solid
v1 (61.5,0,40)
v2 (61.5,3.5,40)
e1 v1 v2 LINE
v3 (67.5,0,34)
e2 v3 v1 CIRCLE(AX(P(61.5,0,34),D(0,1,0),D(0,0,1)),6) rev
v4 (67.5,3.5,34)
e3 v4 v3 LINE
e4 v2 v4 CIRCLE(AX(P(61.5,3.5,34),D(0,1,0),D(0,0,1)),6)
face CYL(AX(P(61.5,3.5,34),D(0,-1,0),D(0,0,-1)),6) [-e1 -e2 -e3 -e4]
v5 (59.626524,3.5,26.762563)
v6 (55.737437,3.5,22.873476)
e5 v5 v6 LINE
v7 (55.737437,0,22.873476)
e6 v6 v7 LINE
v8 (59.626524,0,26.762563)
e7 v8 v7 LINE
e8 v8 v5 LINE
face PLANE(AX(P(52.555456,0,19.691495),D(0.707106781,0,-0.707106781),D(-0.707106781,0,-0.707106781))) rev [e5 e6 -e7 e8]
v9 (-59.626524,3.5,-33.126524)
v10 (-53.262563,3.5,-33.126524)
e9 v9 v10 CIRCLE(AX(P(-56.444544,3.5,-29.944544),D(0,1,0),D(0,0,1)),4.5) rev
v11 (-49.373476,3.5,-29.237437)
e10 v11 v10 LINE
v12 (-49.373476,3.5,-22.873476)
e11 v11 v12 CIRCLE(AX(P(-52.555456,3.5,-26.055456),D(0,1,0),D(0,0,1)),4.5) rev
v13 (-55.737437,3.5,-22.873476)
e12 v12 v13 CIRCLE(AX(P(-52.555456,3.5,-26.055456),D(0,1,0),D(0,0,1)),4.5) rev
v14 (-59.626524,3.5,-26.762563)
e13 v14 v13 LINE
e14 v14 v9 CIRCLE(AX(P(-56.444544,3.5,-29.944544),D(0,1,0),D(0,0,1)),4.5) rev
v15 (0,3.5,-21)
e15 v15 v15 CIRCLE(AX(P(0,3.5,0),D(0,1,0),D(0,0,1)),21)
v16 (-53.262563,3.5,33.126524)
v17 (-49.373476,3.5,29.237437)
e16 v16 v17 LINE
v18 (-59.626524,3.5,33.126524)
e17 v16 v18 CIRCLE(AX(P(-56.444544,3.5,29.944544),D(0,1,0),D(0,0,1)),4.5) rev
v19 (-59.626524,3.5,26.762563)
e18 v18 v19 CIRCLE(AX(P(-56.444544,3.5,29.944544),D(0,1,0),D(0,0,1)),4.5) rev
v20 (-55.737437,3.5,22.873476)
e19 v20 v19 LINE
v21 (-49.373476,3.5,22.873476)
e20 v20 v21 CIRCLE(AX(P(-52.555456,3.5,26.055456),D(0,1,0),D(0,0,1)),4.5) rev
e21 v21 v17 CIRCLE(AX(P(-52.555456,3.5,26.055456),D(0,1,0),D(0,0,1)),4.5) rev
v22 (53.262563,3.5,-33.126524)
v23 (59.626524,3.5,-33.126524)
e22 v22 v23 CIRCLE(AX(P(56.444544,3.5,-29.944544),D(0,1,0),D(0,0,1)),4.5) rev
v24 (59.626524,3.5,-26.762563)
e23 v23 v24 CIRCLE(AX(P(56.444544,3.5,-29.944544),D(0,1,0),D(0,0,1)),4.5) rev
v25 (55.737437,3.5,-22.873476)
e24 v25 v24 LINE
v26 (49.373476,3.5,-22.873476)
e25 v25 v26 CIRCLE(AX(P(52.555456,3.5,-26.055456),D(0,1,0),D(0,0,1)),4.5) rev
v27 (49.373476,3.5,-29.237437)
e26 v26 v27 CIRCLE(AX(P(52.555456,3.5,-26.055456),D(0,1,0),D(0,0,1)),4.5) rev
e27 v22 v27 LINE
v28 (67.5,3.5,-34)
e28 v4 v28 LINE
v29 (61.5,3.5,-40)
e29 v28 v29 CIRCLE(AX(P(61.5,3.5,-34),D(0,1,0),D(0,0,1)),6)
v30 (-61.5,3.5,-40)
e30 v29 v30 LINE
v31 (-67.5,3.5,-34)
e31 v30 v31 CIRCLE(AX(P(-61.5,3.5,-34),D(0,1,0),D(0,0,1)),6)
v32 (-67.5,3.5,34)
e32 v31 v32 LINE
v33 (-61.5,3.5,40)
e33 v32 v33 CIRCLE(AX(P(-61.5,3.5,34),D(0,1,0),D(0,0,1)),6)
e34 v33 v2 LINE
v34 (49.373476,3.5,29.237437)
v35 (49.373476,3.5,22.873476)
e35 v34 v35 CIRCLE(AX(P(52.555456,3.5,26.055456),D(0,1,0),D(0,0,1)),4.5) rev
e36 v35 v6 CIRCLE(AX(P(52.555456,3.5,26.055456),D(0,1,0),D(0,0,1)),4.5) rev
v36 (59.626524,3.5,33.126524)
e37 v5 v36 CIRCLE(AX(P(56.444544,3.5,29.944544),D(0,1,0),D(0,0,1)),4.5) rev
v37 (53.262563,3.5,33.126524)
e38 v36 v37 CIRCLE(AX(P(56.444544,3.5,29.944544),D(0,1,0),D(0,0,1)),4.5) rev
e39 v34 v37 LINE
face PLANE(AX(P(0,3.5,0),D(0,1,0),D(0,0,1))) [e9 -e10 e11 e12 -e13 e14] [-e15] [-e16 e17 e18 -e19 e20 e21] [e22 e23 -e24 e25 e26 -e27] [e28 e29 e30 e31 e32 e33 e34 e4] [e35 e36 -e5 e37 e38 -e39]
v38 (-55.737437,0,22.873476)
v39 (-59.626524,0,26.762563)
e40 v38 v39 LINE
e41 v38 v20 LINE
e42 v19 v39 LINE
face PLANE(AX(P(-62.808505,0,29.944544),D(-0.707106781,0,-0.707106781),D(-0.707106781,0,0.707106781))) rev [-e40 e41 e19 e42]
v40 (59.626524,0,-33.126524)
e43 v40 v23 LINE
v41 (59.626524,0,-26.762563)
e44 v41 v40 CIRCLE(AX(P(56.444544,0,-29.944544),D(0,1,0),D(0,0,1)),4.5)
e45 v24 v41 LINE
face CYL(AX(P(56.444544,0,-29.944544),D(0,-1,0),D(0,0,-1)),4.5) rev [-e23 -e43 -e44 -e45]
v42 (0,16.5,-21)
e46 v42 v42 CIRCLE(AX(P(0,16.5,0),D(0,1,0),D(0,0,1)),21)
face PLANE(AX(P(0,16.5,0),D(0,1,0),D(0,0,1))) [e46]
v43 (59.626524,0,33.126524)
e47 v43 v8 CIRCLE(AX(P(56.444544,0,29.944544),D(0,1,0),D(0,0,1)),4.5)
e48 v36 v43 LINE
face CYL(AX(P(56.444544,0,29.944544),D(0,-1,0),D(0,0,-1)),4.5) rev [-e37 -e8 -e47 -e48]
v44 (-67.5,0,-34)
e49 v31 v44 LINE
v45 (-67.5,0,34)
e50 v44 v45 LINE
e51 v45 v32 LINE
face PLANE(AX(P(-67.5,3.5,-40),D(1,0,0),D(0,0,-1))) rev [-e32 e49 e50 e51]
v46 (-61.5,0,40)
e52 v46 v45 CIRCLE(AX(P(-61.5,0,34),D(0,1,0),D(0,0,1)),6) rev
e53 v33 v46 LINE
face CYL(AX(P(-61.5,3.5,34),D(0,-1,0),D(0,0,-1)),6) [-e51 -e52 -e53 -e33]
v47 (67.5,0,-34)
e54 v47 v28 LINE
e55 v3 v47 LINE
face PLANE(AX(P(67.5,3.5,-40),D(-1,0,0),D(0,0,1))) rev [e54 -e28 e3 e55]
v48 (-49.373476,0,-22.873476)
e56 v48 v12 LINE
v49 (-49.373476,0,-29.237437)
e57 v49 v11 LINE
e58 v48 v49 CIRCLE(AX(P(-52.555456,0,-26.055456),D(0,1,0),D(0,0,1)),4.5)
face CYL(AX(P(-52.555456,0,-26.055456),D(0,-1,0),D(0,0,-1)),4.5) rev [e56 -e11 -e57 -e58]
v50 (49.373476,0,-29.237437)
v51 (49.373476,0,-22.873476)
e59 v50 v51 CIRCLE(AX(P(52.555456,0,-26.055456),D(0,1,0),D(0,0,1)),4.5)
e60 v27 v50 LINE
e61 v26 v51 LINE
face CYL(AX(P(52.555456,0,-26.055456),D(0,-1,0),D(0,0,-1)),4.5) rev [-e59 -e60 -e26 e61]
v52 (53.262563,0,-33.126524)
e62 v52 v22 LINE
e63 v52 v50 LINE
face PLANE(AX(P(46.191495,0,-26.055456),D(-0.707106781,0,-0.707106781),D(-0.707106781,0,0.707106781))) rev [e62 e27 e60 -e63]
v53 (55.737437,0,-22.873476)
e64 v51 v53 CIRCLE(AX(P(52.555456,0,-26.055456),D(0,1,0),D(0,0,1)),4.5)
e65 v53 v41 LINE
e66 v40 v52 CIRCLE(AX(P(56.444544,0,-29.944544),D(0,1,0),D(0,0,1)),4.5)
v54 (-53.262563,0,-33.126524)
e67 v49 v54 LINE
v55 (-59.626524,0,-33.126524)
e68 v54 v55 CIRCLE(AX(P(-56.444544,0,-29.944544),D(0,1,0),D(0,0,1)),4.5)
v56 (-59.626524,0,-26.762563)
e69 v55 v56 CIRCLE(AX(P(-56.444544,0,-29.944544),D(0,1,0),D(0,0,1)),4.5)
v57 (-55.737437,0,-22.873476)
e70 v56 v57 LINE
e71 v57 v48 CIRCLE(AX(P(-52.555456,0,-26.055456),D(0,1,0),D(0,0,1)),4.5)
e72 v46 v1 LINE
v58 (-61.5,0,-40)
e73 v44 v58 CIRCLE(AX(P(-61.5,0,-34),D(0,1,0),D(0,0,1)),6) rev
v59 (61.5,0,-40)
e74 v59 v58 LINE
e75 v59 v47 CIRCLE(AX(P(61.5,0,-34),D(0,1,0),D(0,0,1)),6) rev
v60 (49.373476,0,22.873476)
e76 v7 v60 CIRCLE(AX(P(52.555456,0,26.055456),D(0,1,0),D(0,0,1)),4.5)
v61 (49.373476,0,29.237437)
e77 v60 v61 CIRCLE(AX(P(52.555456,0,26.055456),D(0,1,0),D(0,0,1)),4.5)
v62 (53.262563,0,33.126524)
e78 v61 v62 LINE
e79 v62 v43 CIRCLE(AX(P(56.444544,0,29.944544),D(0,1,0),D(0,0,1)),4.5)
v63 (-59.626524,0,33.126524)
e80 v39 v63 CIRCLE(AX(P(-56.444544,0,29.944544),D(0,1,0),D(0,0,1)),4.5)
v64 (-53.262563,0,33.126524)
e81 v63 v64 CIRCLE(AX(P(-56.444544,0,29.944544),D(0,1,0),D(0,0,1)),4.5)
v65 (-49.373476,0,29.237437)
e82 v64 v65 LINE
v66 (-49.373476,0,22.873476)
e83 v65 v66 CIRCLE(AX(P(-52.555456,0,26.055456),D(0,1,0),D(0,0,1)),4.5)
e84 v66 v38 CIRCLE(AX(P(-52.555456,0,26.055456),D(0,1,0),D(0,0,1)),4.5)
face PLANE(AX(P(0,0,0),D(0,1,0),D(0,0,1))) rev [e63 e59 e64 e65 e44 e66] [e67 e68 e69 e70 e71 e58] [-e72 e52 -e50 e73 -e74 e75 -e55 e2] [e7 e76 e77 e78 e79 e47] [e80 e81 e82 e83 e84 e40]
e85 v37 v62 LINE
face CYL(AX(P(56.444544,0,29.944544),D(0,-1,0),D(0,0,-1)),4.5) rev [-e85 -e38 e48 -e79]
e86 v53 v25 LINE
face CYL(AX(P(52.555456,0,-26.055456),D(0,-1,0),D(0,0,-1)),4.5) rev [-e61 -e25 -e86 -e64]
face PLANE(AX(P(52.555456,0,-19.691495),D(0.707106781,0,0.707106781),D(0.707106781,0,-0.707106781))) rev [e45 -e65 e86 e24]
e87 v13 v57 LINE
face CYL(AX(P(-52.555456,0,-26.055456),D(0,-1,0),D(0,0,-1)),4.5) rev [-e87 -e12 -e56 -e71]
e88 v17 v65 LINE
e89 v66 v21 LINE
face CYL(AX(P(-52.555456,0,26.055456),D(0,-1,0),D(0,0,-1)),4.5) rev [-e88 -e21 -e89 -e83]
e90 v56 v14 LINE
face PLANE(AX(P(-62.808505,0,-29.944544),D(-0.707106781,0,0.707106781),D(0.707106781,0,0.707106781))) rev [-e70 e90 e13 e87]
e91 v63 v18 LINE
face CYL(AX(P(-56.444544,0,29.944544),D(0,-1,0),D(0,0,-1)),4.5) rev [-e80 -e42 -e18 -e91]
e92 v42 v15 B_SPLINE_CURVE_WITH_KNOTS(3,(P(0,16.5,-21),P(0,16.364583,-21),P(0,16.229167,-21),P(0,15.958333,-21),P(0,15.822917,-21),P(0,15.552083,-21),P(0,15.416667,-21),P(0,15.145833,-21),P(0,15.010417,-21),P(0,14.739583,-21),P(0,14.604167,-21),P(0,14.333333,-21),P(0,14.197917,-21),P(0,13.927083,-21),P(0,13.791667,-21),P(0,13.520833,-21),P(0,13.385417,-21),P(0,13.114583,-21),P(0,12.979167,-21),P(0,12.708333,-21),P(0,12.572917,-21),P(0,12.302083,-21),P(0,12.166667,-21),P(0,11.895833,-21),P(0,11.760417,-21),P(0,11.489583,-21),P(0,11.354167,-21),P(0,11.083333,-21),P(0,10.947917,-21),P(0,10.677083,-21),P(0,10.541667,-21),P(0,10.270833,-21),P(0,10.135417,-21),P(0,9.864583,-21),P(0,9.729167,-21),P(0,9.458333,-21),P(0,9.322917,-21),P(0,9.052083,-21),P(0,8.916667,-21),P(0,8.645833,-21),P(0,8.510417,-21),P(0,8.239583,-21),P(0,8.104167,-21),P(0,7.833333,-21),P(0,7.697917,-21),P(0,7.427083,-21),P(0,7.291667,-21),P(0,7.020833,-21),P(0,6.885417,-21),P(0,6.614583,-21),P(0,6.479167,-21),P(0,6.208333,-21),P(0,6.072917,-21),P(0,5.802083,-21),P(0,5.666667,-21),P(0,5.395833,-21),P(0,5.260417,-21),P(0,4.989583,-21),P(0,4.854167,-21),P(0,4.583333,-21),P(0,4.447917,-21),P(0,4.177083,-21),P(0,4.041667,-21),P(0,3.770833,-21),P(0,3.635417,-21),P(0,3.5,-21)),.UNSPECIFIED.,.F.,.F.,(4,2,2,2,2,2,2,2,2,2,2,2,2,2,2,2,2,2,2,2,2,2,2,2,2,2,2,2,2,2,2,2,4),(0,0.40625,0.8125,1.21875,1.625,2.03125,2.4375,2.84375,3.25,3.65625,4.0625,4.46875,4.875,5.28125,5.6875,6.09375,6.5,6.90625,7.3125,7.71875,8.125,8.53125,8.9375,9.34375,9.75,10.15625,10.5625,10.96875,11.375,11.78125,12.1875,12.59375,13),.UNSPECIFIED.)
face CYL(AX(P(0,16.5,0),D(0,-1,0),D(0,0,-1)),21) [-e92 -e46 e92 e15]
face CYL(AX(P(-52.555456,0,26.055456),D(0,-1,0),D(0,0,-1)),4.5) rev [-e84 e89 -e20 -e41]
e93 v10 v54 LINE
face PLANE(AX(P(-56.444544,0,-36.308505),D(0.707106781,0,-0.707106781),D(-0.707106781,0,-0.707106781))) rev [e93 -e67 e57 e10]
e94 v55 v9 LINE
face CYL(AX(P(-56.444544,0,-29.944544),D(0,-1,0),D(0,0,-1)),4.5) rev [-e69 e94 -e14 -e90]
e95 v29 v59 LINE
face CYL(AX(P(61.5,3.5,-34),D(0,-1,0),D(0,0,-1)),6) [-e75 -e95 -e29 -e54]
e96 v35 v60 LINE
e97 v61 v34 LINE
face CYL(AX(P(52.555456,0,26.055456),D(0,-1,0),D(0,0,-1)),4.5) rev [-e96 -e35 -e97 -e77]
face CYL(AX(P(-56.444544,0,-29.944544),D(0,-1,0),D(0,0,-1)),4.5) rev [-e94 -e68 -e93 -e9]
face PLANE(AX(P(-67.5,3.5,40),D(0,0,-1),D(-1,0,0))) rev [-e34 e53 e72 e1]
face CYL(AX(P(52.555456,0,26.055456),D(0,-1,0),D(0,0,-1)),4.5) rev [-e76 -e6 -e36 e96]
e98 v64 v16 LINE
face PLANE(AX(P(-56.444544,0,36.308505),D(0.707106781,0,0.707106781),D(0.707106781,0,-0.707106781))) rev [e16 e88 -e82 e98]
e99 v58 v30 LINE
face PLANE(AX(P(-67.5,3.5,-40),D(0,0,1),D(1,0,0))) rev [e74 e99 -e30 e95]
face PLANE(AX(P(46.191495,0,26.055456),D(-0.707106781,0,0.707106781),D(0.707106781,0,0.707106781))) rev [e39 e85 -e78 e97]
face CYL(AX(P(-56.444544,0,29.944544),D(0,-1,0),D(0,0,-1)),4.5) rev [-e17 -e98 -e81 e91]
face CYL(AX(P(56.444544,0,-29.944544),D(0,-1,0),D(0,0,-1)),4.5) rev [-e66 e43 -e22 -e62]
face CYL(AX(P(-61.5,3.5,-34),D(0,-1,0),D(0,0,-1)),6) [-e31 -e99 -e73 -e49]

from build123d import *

# Parameters (mm, degrees)
SKETCH1_W           = 135
SKETCH1_H           = 80
BOSS_EXTRUDE1_DEPTH = 3.5
SKETCH2_R           = 21
BOSS_EXTRUDE2_DEPTH = 13
CUT_EXTRUDE1_DEPTH  = 80.531440324
FILLET1_R           = 6
FILLET2_R           = 4.5


with BuildPart() as part:
    # Sketch1 → Boss-Extrude1 (new body)
    with BuildSketch(Plane(origin=(0, 0, 0), x_dir=(1, 0, 0), z_dir=(0, 1, 0))):
        Rectangle(SKETCH1_W, SKETCH1_H)
    extrude(amount=BOSS_EXTRUDE1_DEPTH)

    # Sketch2 → Boss-Extrude2 (add)
    with BuildSketch(Plane(origin=(0, 3.5, 0), x_dir=(1, 0, 0), z_dir=(0, 1, 0))):
        with Locations(Location((0, 0, 0), (0, 0, 90))):
            Circle(SKETCH2_R)
    extrude(amount=BOSS_EXTRUDE2_DEPTH)

    # Sketch4 → Cut-Extrude1 (cut, through all)
    with BuildSketch(Plane(origin=(0, 3.5, 0), x_dir=(1, 0, 0), z_dir=(0, 1, 0))):
        Polygon((46.191495321, -26.055456352), (56.444543648, -36.308504679), (62.808504679, -29.944543648), (52.555456352, -19.691495321), align=None)
        Polygon((-56.444543648, 36.308504679), (-46.191495321, 26.055456352), (-52.555456352, 19.691495321), (-62.808504679, 29.944543648), align=None)
        Polygon((62.808504679, 29.944543648), (56.444543648, 36.308504679), (46.191495321, 26.055456352), (52.555456352, 19.691495321), align=None)
        Polygon((-62.808504679, -29.944543648), (-52.555456352, -19.691495321), (-46.191495321, -26.055456352), (-56.444543648, -36.308504679), align=None)
    extrude(amount=-CUT_EXTRUDE1_DEPTH, mode=Mode.SUBTRACT)

    # Fillet1
    fillet1_edges = [part.edges().sort_by_distance(p)[0] for p in [
        (67.5, 1.75, 40),
        (-67.5, 1.75, 40),
        (-67.5, 1.75, -40),
        (67.5, 1.75, -40),
    ]]
    fillet(fillet1_edges, radius=FILLET1_R)

    # Fillet2
    fillet2_edges = [part.edges().sort_by_distance(p)[0] for p in [
        (56.444543648, 1.75, -36.308504679),
        (52.555456352, 1.75, 19.691495321),
        (46.191495321, 1.75, -26.055456352),
        (46.191495321, 1.75, 26.055456352),
        (52.555456352, 1.75, -19.691495321),
        (56.444543648, 1.75, 36.308504679),
        (62.808504679, 1.75, -29.944543648),
        (62.808504679, 1.75, 29.944543648),
        (-52.555456352, 1.75, 19.691495321),
        (-46.191495321, 1.75, 26.055456352),
        (-46.191495321, 1.75, -26.055456352),
        (-52.555456352, 1.75, -19.691495321),
        (-56.444543648, 1.75, 36.308504679),
        (-62.808504679, 1.75, 29.944543648),
        (-62.808504679, 1.75, -29.944543648),
        (-56.444543648, 1.75, -36.308504679),
    ]]
    fillet(fillet2_edges, radius=FILLET2_R - 0.0001)  # a hair under: the kernel refuses the full size


solid = part.part
